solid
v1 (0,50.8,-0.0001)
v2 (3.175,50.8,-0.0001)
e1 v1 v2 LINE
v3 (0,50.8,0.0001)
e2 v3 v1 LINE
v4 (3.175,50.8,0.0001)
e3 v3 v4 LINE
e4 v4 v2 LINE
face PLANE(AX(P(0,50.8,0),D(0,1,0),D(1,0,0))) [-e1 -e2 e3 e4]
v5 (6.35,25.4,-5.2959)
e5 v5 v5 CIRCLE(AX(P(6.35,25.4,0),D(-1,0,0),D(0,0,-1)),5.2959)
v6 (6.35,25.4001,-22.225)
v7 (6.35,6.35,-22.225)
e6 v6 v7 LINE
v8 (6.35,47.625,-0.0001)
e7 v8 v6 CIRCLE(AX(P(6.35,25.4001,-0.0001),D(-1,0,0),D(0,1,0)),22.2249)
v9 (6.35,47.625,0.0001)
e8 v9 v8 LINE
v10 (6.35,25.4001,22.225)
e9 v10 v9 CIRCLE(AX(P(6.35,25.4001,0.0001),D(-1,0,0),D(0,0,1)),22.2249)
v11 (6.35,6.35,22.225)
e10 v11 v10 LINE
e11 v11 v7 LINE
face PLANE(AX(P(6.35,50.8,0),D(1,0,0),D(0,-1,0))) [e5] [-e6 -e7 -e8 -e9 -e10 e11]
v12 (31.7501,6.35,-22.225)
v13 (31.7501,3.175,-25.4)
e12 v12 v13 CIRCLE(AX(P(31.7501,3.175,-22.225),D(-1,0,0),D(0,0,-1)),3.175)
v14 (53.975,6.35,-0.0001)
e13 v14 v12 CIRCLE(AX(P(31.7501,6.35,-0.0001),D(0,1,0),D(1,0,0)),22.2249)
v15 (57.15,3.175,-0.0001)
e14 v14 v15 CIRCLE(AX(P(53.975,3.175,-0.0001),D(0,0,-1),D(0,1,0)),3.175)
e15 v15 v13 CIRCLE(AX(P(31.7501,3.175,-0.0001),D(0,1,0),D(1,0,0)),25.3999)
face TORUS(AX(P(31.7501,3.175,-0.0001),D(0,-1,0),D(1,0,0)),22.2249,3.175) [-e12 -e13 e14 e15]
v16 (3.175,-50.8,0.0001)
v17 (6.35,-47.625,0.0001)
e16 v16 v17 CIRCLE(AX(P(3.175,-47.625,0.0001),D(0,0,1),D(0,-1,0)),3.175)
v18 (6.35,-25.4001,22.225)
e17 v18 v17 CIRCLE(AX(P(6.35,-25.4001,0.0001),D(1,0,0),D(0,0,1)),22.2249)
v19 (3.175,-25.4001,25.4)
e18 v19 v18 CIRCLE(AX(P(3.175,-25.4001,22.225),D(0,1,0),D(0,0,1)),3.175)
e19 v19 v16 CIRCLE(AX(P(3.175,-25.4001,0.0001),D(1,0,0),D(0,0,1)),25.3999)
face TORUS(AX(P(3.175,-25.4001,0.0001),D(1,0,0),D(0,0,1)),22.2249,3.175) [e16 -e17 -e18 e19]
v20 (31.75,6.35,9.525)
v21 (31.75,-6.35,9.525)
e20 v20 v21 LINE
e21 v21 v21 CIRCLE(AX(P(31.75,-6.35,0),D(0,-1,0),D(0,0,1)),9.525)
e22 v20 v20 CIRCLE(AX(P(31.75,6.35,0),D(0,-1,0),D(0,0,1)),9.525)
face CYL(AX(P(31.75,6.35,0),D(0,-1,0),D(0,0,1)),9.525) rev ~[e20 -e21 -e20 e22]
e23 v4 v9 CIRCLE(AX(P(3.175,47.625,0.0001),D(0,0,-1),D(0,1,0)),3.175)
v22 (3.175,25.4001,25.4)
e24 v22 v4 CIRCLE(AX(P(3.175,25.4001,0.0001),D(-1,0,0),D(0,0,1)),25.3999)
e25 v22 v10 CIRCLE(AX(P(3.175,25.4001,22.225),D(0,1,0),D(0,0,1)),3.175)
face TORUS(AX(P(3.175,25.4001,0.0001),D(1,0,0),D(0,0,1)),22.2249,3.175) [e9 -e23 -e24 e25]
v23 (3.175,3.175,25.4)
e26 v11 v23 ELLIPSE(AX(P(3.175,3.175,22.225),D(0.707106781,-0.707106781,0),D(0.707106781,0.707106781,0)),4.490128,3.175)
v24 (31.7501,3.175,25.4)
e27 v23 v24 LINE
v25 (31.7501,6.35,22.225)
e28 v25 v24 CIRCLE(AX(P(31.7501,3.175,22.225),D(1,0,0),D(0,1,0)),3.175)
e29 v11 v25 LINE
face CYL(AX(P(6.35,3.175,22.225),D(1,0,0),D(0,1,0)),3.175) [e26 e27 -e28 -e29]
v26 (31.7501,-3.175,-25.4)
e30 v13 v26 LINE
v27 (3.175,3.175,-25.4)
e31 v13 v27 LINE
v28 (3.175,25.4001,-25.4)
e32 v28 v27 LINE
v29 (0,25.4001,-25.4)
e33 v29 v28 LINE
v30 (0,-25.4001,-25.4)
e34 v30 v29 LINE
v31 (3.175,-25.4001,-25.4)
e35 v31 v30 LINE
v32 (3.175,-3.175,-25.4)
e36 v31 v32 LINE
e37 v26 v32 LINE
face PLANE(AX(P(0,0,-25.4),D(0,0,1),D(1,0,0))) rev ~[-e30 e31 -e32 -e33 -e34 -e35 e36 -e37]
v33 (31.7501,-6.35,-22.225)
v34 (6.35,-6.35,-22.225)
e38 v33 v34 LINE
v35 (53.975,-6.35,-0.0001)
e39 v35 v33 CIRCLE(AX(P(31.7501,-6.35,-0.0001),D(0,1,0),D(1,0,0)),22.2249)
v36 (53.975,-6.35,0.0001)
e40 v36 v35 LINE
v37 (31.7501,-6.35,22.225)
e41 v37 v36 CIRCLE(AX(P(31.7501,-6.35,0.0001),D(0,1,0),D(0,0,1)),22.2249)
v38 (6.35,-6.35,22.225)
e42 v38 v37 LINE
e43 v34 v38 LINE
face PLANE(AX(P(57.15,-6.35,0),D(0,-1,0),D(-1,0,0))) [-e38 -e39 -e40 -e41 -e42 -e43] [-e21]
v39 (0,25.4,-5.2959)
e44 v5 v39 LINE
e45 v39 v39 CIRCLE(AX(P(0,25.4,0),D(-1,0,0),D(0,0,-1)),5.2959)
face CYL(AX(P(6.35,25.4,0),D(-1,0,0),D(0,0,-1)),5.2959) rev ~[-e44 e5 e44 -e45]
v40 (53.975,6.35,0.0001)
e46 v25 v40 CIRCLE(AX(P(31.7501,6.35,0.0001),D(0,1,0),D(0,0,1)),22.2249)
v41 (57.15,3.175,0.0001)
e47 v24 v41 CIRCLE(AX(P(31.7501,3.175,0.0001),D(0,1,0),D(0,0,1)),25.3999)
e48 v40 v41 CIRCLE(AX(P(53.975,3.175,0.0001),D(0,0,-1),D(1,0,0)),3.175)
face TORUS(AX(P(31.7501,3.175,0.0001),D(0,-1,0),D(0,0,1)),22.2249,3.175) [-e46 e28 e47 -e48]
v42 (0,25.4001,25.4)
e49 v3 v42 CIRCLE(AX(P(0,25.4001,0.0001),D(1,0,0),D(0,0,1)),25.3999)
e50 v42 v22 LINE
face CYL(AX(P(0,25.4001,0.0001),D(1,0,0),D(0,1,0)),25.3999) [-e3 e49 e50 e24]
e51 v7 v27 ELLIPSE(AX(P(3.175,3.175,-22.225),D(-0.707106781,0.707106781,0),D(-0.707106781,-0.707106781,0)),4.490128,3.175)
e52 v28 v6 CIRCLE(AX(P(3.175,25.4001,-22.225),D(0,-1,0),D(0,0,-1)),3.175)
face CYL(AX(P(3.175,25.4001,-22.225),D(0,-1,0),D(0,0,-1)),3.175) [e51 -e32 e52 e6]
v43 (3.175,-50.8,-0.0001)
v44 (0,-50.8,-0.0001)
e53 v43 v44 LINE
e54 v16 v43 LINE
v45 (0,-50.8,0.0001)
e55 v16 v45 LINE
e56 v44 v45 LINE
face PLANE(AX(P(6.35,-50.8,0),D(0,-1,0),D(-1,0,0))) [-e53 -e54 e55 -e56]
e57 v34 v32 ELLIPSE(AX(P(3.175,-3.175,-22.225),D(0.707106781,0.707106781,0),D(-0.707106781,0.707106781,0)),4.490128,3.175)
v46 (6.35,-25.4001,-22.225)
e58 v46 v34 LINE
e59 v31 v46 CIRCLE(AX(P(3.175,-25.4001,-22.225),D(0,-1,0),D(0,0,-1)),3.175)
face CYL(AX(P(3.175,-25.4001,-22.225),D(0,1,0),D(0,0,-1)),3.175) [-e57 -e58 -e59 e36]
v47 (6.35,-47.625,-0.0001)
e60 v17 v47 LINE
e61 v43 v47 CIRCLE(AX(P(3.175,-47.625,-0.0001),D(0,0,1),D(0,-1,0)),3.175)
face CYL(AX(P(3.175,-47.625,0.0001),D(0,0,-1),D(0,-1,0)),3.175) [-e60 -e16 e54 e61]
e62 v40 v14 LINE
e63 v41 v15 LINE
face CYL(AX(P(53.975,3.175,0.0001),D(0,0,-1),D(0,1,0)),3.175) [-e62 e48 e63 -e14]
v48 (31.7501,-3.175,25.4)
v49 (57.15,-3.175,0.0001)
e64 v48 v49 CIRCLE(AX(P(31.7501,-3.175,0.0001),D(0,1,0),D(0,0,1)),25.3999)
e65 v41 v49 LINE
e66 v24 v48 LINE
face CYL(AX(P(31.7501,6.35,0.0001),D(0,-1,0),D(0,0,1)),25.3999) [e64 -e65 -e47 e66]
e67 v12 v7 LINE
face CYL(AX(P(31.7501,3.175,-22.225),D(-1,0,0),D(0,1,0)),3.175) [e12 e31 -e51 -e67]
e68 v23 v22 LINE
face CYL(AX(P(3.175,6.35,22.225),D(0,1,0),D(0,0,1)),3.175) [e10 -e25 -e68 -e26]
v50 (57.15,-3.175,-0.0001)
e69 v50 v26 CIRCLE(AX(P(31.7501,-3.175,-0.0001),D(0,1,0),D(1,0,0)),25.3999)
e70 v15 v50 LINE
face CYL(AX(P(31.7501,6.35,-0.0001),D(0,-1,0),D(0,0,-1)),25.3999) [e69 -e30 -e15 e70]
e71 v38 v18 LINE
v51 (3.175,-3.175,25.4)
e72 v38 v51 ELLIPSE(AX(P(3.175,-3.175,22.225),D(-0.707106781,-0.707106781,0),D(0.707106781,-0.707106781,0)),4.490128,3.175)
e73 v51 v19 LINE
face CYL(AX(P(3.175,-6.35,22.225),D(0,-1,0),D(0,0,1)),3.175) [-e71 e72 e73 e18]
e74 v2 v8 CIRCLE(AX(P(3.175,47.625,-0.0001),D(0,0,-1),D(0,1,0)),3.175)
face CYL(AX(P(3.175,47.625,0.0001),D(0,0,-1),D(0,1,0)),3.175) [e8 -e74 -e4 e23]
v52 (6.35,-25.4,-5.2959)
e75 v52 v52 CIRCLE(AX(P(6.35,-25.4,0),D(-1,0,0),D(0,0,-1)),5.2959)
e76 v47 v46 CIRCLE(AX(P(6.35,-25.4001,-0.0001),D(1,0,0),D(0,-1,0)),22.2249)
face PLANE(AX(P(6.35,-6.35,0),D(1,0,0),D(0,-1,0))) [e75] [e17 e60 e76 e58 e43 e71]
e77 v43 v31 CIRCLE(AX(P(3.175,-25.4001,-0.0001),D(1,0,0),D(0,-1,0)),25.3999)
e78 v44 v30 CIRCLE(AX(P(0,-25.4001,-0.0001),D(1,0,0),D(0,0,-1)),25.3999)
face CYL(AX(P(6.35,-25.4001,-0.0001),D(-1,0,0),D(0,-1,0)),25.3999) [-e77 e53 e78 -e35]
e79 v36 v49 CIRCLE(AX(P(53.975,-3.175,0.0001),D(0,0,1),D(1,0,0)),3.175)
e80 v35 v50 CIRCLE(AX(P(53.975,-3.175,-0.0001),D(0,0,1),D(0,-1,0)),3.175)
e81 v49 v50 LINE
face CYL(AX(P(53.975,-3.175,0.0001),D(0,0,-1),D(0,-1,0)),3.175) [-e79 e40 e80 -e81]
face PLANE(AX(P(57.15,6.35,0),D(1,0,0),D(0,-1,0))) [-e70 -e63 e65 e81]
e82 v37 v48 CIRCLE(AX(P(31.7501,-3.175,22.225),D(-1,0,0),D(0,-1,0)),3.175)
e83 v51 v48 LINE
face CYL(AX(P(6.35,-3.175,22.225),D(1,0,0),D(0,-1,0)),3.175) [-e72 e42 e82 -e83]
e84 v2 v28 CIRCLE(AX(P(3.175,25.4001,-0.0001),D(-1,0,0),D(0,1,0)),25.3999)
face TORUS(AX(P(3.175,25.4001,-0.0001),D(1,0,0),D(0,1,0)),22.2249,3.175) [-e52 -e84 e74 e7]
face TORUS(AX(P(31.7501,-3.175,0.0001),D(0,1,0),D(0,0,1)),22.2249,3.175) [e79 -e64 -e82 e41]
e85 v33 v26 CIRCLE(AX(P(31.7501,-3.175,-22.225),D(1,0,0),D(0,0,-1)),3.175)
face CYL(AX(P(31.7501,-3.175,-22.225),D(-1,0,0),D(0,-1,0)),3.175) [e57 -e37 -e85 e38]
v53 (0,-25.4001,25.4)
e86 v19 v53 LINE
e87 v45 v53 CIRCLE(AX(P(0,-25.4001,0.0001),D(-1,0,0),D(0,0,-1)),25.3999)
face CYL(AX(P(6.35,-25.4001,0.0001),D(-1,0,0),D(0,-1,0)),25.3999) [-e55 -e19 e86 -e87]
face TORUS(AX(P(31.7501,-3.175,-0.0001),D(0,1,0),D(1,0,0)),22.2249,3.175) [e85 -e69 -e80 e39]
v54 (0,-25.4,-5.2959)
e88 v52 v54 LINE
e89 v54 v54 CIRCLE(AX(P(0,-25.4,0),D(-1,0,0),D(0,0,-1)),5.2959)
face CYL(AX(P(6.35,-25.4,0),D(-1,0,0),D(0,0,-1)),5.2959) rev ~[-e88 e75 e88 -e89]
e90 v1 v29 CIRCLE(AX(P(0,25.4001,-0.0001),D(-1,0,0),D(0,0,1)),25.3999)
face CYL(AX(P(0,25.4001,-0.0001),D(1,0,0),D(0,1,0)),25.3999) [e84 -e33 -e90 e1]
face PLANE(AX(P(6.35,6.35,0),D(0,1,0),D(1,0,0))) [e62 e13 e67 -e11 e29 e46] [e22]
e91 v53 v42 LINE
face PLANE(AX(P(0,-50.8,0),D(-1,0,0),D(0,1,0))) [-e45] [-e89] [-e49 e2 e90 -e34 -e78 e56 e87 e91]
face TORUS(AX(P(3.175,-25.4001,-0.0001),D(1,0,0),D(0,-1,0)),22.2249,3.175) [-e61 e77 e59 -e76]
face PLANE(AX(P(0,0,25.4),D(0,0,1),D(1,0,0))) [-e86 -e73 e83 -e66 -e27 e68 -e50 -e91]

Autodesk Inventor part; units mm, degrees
ref_plane "YZ Plane" through (0, 0, 0) normal (1, 0, 0) x (0, 1, 0)
ref_plane "XZ Plane" through (0, 0, 0) normal (0, 1, 0) x (-1, 0, 0)
ref_plane "XY Plane" through (0, 0, 0) normal (0, 0, 1) x (1, 0, 0)
sketch "Sketch1" plane through (0, 0, 0) normal (0, 0, 1) x (1, 0, 0)
  line L0 (0, -50.8) -> (0, 50.8)
  line L1 (0, 50.8) -> (6.35, 50.8)
  line L2 (6.35, 50.8) -> (6.35, 6.35)
  line L3 (6.35, 6.35) -> (57.15, 6.35)
  line L4 (57.15, 6.35) -> (57.15, -6.35)
  line L5 (57.15, -6.35) -> (6.35, -6.35)
  line L6 (6.35, -6.35) -> (6.35, -50.8)
  line L7 (6.35, -50.8) -> (0, -50.8)
  line L8 (0, 0) -> (57.15, 0) construction
  dimension "d0" = 12.7
  dimension "d1" = 101.6
  dimension "d2" = 50.8
  dimension "d3" = 6.35
extrude "Extrusion1" add sketch "Sketch1" along normal mid plane 50.8
fillet "Fillet1" radius 25.4 6 edges at (57.15, 0, 25.4) (57.15, 0, -25.4) (3.175, 50.8, -25.4) (3.175, 50.8, 25.4) (3.175, -50.8, 25.4) (3.175, -50.8, -25.4)
fillet "Fillet2" radius 3.175 12 edges at (49.7105, 6.35, 17.9605) (19.05, 6.35, -25.4) (19.05, 6.35, 25.4) (49.7105, -6.35, 17.9605) (19.05, -6.35, -25.4) (19.05, -6.35, 25.4) (6.35, 15.875, -25.4) (6.35, 15.875, 25.4) (6.35, 43.3605, -17.9605) (6.35, -15.875, 25.4) (6.35, -15.875, -25.4) (6.35, -43.3605, 17.9605)
hole "Hole1" at (31.75, 6.35, 0) direction (0, -1, 0) diameter 19.05 end through all
sketch "Sketch2" plane through (6.35, 6.35, 22.225) normal (1, 0, 0) x (0, 0, -1)
  line L0 (22.225, 19.05) -> (22.225, -31.75) construction
  point P0 (22.225, -6.35)
  point P1 (22.225, -6.35)
  dimension "d17" = 50.8
hole "Hole2" at (6.35, 25.4, 0) at (6.35, -25.4, 0) direction (-1, 0, 0) diameter 10.5918 end through all thread size "1/2-13 UNC" class "2B" standard "ANSI Unified Screw Threads"
properties part number "Door Hinge" material "Steel, Alloy"
